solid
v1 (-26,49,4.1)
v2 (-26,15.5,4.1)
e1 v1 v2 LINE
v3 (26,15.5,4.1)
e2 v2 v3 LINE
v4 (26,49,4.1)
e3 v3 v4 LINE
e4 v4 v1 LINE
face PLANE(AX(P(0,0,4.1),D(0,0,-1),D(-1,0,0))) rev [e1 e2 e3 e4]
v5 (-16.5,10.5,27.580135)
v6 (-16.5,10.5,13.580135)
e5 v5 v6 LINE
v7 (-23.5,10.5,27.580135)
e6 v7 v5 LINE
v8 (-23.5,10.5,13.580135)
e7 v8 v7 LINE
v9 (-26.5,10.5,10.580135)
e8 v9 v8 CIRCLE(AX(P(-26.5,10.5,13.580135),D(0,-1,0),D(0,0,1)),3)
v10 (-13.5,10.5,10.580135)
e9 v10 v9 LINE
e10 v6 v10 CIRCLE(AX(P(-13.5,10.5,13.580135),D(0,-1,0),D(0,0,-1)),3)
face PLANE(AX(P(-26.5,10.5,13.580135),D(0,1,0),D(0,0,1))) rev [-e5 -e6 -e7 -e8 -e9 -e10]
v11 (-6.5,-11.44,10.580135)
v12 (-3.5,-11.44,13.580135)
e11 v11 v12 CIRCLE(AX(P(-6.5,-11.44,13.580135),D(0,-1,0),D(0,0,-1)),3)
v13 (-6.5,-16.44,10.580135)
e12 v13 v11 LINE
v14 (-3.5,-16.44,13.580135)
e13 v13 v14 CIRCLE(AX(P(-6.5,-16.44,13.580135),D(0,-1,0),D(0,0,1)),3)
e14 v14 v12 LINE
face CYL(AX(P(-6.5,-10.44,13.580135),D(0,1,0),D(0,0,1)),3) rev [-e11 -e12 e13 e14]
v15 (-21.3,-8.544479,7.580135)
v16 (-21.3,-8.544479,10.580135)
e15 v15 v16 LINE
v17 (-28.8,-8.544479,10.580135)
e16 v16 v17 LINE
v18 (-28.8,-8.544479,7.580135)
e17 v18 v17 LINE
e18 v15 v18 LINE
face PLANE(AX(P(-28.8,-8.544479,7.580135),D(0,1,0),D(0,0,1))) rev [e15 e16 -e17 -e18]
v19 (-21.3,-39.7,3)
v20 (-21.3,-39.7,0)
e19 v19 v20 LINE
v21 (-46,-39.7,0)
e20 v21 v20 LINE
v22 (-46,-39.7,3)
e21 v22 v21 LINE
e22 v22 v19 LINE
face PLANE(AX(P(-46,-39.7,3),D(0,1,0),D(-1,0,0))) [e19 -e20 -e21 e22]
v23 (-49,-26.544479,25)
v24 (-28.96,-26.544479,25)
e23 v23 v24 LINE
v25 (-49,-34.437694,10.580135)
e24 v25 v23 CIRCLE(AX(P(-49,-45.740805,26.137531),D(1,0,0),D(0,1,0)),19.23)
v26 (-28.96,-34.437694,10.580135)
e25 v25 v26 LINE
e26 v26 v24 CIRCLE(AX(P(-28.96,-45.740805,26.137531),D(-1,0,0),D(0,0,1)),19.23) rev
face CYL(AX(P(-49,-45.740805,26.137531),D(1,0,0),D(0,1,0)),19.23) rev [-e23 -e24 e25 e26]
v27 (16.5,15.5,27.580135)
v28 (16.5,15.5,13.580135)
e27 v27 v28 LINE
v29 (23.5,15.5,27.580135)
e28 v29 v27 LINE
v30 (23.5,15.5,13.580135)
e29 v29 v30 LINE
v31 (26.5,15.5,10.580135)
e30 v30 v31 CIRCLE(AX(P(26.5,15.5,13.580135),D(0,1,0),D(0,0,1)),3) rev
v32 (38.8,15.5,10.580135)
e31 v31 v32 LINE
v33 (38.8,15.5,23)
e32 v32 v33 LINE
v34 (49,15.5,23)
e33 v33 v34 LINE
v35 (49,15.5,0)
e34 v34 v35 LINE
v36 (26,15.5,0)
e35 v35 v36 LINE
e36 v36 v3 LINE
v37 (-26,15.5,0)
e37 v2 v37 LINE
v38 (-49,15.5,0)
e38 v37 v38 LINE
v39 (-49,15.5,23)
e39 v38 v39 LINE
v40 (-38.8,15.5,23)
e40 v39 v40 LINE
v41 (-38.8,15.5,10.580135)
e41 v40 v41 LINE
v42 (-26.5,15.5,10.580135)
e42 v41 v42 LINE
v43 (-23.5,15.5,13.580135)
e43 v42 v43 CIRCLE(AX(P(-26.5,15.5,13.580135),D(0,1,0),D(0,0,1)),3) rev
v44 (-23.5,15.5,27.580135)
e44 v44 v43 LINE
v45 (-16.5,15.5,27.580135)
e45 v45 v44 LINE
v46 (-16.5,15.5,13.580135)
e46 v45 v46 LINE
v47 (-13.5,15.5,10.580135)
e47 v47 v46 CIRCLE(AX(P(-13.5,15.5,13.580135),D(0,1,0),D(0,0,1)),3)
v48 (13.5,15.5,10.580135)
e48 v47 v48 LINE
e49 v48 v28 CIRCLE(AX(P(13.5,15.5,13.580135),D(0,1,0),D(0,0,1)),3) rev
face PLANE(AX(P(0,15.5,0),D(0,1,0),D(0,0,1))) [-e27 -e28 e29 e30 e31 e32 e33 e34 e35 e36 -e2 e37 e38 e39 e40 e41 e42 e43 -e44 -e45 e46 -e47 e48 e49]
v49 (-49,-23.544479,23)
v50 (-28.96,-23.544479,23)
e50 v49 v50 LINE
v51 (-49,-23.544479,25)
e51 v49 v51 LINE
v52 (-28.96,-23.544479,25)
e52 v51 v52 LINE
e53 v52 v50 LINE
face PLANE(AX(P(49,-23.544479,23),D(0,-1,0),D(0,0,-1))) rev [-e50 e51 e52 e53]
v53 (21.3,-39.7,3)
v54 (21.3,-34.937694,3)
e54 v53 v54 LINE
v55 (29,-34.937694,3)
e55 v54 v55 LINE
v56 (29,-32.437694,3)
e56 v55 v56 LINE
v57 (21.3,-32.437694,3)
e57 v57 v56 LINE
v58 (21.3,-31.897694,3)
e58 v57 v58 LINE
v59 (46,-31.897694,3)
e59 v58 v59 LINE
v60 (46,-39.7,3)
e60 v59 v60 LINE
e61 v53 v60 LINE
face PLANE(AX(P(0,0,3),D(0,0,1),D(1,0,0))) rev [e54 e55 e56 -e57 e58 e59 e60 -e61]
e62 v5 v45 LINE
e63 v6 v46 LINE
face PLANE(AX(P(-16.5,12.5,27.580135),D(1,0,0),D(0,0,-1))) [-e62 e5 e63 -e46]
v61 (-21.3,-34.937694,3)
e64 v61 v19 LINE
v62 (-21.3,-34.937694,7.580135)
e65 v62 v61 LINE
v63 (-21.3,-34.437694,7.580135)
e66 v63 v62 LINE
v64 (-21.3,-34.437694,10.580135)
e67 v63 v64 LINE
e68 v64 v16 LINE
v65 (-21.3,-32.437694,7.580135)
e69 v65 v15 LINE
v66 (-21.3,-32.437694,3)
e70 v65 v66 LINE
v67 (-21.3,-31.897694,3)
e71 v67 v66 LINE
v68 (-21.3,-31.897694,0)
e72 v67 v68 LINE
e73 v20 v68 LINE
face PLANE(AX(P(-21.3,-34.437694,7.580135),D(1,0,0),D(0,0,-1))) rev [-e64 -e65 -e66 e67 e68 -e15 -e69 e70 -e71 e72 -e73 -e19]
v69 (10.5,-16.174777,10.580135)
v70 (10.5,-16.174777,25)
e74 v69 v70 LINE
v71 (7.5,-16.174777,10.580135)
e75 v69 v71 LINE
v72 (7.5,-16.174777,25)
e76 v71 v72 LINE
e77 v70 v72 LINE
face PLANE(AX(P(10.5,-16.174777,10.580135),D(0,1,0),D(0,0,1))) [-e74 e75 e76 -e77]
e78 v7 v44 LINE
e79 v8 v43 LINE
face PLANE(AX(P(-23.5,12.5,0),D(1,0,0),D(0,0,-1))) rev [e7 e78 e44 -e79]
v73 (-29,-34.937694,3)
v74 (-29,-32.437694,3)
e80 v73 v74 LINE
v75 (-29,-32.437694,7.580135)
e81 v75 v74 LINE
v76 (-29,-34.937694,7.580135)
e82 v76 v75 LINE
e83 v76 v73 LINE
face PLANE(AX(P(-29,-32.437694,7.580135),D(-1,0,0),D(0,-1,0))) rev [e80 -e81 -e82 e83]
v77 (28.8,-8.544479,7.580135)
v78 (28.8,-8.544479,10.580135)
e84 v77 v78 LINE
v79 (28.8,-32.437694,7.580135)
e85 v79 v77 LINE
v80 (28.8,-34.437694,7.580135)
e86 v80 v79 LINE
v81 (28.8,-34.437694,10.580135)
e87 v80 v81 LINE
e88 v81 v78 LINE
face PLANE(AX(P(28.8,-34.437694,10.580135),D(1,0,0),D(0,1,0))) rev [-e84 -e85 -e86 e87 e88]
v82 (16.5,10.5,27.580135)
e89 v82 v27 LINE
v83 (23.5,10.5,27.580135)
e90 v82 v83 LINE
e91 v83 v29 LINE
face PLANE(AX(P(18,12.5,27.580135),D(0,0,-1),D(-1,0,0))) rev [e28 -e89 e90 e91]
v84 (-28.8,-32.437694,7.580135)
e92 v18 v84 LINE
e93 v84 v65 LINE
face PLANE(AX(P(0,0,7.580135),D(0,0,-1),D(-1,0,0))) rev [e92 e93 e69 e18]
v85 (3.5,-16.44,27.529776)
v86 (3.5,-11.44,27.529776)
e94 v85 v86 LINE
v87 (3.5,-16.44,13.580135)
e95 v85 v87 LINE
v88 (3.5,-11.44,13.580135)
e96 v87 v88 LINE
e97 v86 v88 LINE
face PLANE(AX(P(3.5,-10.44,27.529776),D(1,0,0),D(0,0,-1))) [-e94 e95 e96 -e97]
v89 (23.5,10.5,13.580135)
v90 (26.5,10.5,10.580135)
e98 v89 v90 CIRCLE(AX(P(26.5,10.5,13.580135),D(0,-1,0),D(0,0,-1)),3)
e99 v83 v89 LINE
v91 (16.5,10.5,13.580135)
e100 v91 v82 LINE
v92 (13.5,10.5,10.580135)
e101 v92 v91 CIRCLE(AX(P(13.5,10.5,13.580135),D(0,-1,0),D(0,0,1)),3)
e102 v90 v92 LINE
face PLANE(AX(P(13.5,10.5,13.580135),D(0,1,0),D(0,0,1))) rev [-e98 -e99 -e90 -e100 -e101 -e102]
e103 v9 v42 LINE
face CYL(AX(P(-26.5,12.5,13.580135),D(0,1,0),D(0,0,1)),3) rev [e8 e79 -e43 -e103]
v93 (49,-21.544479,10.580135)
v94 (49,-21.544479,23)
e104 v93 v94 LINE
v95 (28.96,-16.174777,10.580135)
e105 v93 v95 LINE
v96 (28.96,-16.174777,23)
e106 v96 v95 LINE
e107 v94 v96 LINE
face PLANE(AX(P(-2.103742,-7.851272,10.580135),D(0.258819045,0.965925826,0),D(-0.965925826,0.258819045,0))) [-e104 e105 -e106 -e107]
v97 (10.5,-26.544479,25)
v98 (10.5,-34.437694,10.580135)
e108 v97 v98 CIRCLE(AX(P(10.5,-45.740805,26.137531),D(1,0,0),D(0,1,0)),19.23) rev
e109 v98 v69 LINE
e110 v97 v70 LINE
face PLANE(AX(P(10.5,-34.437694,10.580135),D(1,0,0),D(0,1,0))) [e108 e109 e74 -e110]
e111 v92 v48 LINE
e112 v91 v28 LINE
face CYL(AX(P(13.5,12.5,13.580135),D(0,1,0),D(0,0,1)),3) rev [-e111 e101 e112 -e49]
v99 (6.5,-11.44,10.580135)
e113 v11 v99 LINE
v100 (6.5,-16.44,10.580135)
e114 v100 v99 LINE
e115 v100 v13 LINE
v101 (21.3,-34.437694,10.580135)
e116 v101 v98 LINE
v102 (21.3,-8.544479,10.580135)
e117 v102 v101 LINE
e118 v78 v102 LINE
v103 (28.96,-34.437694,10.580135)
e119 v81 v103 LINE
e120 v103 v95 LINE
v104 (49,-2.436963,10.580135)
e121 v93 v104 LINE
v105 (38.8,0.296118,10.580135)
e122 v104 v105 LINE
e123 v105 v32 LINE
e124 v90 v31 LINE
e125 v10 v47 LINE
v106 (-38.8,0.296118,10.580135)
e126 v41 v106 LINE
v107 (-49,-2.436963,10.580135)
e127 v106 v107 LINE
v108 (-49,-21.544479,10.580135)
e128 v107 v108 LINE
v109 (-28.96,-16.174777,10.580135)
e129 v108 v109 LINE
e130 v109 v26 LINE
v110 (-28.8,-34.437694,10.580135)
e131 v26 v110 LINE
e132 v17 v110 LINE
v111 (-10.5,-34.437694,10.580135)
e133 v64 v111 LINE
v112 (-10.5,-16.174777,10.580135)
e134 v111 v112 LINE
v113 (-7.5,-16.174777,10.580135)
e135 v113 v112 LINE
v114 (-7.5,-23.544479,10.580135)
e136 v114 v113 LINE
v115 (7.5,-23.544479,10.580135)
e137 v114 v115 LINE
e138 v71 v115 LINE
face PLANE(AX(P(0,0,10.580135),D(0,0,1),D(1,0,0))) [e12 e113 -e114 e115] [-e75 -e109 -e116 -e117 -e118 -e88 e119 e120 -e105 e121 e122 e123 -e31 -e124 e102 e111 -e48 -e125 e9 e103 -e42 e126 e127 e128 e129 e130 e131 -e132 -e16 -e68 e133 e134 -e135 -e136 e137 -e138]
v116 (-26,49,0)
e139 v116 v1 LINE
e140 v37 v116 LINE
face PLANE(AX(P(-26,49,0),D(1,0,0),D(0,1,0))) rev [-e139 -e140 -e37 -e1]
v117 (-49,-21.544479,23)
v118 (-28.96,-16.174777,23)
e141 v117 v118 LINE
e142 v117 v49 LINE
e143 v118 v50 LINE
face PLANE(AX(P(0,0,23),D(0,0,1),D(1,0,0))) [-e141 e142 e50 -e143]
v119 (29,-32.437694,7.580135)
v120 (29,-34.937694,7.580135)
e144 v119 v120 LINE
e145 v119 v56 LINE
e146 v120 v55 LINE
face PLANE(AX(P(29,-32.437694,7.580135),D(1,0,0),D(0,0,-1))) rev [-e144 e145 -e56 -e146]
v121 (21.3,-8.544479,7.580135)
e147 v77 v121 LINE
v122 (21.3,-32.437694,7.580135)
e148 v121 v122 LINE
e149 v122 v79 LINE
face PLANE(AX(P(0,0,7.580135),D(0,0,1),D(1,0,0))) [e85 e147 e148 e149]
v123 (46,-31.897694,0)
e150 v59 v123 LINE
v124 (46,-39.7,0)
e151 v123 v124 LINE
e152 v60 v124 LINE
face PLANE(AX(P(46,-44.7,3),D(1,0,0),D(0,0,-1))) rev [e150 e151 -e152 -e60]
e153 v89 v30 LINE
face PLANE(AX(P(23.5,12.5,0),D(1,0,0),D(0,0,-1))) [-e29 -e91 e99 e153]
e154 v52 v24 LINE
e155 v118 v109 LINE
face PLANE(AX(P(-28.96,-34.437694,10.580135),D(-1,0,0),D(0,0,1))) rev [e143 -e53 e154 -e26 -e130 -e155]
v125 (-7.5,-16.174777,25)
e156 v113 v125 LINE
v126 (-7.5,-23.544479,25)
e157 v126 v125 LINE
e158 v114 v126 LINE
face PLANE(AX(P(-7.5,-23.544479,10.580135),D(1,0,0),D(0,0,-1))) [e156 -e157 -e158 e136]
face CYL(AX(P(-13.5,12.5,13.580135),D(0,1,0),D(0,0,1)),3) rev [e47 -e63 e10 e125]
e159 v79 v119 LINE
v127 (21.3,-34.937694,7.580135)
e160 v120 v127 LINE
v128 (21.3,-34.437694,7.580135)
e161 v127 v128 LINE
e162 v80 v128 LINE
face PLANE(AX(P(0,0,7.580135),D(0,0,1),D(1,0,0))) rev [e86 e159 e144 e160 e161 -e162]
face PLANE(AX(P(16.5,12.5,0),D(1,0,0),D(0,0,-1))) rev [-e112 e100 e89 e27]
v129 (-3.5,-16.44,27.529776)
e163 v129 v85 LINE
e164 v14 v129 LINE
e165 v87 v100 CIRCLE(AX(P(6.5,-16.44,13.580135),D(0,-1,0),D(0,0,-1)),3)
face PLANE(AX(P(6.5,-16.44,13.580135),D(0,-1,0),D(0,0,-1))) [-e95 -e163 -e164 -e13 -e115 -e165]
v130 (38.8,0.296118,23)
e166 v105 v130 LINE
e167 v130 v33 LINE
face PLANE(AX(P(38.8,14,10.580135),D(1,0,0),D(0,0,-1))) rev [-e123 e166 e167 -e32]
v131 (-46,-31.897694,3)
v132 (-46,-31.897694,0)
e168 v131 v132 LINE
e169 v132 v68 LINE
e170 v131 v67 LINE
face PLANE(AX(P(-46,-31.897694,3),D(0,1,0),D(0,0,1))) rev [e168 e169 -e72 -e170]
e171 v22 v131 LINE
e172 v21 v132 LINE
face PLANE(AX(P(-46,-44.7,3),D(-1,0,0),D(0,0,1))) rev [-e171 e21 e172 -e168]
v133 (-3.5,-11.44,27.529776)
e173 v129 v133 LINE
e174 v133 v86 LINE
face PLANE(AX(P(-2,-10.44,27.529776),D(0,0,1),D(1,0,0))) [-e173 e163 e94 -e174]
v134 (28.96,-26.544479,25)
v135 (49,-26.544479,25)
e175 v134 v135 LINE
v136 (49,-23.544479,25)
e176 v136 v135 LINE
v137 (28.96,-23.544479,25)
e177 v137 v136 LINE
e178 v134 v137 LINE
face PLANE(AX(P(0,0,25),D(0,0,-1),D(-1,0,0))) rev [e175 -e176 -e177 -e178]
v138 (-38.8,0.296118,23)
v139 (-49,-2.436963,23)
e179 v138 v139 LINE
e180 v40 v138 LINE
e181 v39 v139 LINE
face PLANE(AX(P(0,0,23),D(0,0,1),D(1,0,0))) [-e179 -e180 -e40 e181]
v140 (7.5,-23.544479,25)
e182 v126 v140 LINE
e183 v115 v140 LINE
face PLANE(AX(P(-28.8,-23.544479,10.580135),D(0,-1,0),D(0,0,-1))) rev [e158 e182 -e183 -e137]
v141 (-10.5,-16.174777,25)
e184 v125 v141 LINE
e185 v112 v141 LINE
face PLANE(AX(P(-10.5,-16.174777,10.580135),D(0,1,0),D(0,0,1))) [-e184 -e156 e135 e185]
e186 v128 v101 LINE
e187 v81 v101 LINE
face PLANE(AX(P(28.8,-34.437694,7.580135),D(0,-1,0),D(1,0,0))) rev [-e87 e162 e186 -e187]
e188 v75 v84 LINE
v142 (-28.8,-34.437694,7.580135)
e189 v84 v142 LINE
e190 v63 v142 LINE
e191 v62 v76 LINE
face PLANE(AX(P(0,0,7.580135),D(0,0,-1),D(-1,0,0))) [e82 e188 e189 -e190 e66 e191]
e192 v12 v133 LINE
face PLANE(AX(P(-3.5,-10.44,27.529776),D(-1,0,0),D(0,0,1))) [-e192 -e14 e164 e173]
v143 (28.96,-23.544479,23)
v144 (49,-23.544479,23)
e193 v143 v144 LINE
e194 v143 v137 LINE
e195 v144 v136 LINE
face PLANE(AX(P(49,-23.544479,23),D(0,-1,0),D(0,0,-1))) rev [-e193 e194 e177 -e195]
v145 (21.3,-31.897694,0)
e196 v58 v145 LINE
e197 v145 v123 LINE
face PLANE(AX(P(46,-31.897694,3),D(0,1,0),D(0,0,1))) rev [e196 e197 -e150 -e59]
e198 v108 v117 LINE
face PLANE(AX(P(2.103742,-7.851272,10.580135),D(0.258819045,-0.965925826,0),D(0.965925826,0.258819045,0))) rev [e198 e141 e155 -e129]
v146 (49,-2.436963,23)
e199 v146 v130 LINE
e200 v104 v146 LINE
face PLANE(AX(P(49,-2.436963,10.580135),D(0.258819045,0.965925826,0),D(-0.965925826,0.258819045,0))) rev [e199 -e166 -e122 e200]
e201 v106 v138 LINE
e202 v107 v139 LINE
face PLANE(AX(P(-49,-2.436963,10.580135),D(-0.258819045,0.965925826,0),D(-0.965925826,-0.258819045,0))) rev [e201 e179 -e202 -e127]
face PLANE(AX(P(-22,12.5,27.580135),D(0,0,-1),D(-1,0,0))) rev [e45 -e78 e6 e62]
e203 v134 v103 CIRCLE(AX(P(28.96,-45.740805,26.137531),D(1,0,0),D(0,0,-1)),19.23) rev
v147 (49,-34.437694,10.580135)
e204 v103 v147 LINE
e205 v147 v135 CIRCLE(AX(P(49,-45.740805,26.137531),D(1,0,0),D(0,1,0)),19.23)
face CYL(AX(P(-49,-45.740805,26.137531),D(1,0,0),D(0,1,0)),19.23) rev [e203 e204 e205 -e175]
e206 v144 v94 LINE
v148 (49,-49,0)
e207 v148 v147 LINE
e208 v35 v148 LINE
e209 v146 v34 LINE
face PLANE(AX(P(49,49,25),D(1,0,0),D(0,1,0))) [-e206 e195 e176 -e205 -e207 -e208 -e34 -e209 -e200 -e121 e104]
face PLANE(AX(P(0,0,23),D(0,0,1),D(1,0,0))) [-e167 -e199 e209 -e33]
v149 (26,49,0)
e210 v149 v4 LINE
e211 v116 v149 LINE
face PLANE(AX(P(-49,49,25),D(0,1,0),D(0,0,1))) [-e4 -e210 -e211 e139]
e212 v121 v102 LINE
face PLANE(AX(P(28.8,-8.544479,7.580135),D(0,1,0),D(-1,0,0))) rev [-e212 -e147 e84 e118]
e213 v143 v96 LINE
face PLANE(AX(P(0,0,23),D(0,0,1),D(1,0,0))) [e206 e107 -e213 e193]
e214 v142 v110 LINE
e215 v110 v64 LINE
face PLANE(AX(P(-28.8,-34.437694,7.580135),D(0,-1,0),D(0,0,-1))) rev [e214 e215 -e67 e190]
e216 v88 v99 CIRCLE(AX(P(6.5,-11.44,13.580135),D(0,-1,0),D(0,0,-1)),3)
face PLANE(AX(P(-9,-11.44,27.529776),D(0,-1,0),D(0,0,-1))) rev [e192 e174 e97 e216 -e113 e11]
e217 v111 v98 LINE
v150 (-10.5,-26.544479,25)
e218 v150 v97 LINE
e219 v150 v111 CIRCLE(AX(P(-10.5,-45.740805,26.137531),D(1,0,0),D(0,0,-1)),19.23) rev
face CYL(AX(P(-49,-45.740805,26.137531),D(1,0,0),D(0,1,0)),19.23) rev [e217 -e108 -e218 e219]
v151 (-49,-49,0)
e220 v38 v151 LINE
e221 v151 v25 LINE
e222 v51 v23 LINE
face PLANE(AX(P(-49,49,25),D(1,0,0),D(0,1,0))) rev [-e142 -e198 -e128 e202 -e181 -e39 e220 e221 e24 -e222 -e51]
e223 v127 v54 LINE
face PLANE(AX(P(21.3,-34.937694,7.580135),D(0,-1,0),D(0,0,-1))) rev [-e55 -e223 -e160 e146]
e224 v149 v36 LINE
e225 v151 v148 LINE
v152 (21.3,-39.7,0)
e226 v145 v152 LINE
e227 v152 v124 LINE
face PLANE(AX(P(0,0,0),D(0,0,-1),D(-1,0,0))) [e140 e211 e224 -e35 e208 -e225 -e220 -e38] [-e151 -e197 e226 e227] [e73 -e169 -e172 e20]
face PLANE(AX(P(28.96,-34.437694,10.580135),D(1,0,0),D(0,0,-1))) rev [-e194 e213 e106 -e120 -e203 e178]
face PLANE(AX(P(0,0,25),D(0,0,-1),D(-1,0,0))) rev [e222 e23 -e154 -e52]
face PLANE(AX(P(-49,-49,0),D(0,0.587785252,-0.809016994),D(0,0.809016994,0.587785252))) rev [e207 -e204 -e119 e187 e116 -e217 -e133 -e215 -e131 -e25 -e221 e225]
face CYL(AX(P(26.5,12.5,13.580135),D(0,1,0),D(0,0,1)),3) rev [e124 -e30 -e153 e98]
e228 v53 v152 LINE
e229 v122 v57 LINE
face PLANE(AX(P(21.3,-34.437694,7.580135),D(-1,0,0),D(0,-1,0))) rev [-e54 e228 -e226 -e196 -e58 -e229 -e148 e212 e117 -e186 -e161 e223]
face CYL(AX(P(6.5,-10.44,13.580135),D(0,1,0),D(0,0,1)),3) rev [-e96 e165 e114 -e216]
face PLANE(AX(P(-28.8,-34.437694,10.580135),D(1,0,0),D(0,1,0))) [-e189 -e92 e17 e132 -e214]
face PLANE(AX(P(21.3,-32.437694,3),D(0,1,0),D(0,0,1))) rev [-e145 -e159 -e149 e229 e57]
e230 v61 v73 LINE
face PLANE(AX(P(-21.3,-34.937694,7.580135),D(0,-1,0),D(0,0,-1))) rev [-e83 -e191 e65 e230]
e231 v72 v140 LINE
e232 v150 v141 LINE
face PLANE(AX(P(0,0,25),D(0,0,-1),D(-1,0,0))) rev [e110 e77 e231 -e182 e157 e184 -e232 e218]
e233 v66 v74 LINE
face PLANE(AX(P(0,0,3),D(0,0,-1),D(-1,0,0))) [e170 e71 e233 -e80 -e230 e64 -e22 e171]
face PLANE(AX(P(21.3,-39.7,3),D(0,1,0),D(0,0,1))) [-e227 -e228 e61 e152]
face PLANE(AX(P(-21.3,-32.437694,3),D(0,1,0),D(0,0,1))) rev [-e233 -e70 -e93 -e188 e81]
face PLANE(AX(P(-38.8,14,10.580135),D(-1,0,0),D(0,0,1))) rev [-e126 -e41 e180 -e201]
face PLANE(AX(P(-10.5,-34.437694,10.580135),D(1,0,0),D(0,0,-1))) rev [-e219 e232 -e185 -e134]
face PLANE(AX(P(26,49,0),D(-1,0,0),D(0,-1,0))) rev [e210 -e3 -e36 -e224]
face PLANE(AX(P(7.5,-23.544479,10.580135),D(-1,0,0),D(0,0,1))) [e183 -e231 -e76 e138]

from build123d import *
from OCP.BRepAlgoAPI import BRepAlgoAPI_Cut
from OCP.TopTools import TopTools_ListOfShape
from build123d.topology import SkipClean

# Parameters (mm, degrees)
CROQUIS1_W               = 98
CROQUIS1_H               = 98
SALIENTE_EXTRUIR2_DEPTH  = 25
CORTAR_EXTRUIR1_DEPTH    = 113.383272777
CROQUIS4_W               = 23
CROQUIS4_H               = 35
CORTAR_EXTRUIR2_DEPTH    = 74.668174947
CROQUIS5_W               = 52
CROQUIS5_H               = 35
CORTAR_EXTRUIR3_DEPTH    = 20
CROQUIS6_W               = 18.3
CROQUIS6_H               = 10.893215352
CORTAR_EXTRUIR4_DEPTH    = 14.419865
CROQUIS7_W               = 57.6
CROQUIS7_H               = 37.544478749
CORTAR_EXTRUIR5_DEPTH    = 14.419865
CROQUIS8_W               = 98
CROQUIS8_H               = 37.544478749
CORTAR_EXTRUIR6_DEPTH    = 2
CORTAR_EXTRUIR7_DEPTH    = 12.419865
CROQUIS10_W              = 10
CROQUIS10_H              = 14.511396986
CORTAR_EXTRUIR8_DEPTH    = 12.419865
CROQUIS13_W              = 7.5
CROQUIS13_H              = 25.893215352
CORTAR_EXTRUIR9_DEPTH    = 3
CROQUIS16_W              = 7.5
CROQUIS16_H              = 2
CORTAR_EXTRUIR10_DEPTH   = 72.452443713
CORTAR_EXTRUIR11_DEPTH   = 3
SALIENTE_EXTRUIR4_DEPTH  = 1.5
CROQUIS24_W              = 52
CROQUIS24_H              = 33.5
SALIENTE_EXTRUIR7_DEPTH  = 1.1
CORTAR_EXTRUIR12_START   = -14.419865
CROQUIS25_W              = 0.16
CROQUIS25_H              = 18.305789039
CORTAR_EXTRUIR12_DEPTH   = 14.419865
CROQUIS26_W              = 3
CROQUIS26_H              = 7.369701816
SALIENTE_EXTRUIR8_DEPTH  = 25
CORTAR_EXTRUIR13_DEPTH   = 12.419865
CROQUIS28_W              = 52
CROQUIS28_H              = 33.5
CORTAR_EXTRUIR14_DEPTH   = 2
CROQUIS29_W              = 24.7
CROQUIS29_H              = 3
SALIENTE_EXTRUIR10_DEPTH = 3
CROQUIS30_W              = 17.2
CROQUIS30_H              = 3.1
CORTAR_EXTRUIR15_DEPTH   = 3
SALIENTE_EXTRUIR11_DEPTH = 3
CROQUIS33_W              = 4
CROQUIS33_H              = 3
CORTAR_EXTRUIR16_DEPTH   = 3
SALIENTE_EXTRUIR12_START = -22.94
SALIENTE_EXTRUIR12_DEPTH = 3
SALIENTE_EXTRUIR13_START = -3
SALIENTE_EXTRUIR13_DEPTH = 3
SALIENTE_EXTRUIR14_START = -3
SALIENTE_EXTRUIR14_DEPTH = 3
CORTAR_EXTRUIR17_DEPTH   = 12.419865
SALIENTE_EXTRUIR15_START = -7.580135
CROQUIS39_W              = 7.5
CROQUIS39_H              = 2
SALIENTE_EXTRUIR15_DEPTH = 7.580135
CROQUIS40_W              = 24.7
CROQUIS40_H              = 2
SALIENTE_EXTRUIR16_DEPTH = 3
CROQUIS41_W              = 24.7
CROQUIS41_H              = 2
CORTAR_EXTRUIR18_DEPTH   = 3
CROQUIS42_W              = 7.7
CROQUIS42_H              = 2.5
CORTAR_EXTRUIR19_DEPTH   = 7.580135
SALIENTE_EXTRUIR17_START = -5
SALIENTE_EXTRUIR17_DEPTH = 5
CROQUIS44_W              = 16.949641927
CROQUIS44_H              = 2
CORTAR_EXTRUIR20_DEPTH   = 12.5
CROQUIS45_W              = 24.7
CROQUIS45_H              = 0.54
CORTAR_EXTRUIR21_DEPTH   = 3
SALIENTE_EXTRUIR18_START = -5
SALIENTE_EXTRUIR18_DEPTH = 2
SALIENTE_EXTRUIR19_START = -7
SALIENTE_EXTRUIR19_DEPTH = 4
CROQUIS49_W              = 16.949641927
CROQUIS49_H              = 2
CORTAR_EXTRUIR22_DEPTH   = 12.5


with BuildPart() as part:
    # Croquis1 → Saliente-Extruir2 (new body)
    with BuildSketch(Plane.XY):
        Rectangle(CROQUIS1_W, CROQUIS1_H)
    extrude(amount=SALIENTE_EXTRUIR2_DEPTH)

    # Croquis3 → Cortar-Extruir1 (cut, through all)
    with BuildSketch(Plane(origin=(49, 0, 0), x_dir=(0, 0, -1), z_dir=(1, 0, 0))):
        with BuildLine():
            Line((0, -49), (-10.580134541, -34.437694101))
            ThreePointArc((-10.580134541, -34.437694101), (-16.90412089, -28.872579006), (-25, -26.544478749))
            Line((-25, -26.544478749), (-25, -49))
            Line((-25, -49), (0, -49))
        make_face()
    extrude(amount=-CORTAR_EXTRUIR1_DEPTH, mode=Mode.SUBTRACT)

    # Croquis4 → Cortar-Extruir2 (cut, through all)
    with BuildSketch(Plane.XY.offset(25)):
        with Locations((-37.5, 31.5)):
            Rectangle(CROQUIS4_W, CROQUIS4_H)
        with Locations((37.5, 31.5)):
            Rectangle(CROQUIS4_W, CROQUIS4_H)
    extrude(amount=-CORTAR_EXTRUIR2_DEPTH, mode=Mode.SUBTRACT)

    # Croquis5 → Cortar-Extruir3 (cut)
    with BuildSketch(Plane.XY.offset(25)):
        with Locations((0, 31.5)):
            Rectangle(CROQUIS5_W, CROQUIS5_H)
    extrude(amount=-CORTAR_EXTRUIR3_DEPTH, mode=Mode.SUBTRACT)

    # Croquis6 → Cortar-Extruir4 (cut)
    with BuildSketch(Plane.XY.offset(25)):
        with Locations((-19.65, -28.991086425)):
            Rectangle(CROQUIS6_W, CROQUIS6_H)
        with Locations((19.65, -28.991086425)):
            Rectangle(CROQUIS6_W, CROQUIS6_H)
    extrude(amount=-CORTAR_EXTRUIR4_DEPTH, mode=Mode.SUBTRACT)

    # Croquis7 → Cortar-Extruir5 (cut)
    with BuildSketch(Plane.XY.offset(25)):
        with Locations((0, -4.772239375)):
            Rectangle(CROQUIS7_W, CROQUIS7_H)
    extrude(amount=-CORTAR_EXTRUIR5_DEPTH, mode=Mode.SUBTRACT)

    # Croquis8 → Cortar-Extruir6 (cut)
    with BuildSketch(Plane.XY.offset(25)):
        with Locations((0, -4.772239375)):
            Rectangle(CROQUIS8_W, CROQUIS8_H)
    extrude(amount=-CORTAR_EXTRUIR6_DEPTH, mode=Mode.SUBTRACT)

    # Croquis9 → Cortar-Extruir7 (cut)
    with BuildSketch(Plane.XY.offset(23)):
        Polygon((-49, -3.244478749), (-49, -21.544478749), (-28.8, -16.131905062), (-28.8, 2.168094938), align=None)
        Polygon((28.8, -16.131905062), (49, -21.544478749), (49, -3.244478749), (28.8, 2.168094938), align=None)
    extrude(amount=-CORTAR_EXTRUIR7_DEPTH, mode=Mode.SUBTRACT)

    # Croquis10 → Cortar-Extruir8 (cut)
    with BuildSketch(Plane.XY.offset(23)):
        with Locations((-33.8, 6.744301507)):
            Rectangle(CROQUIS10_W, CROQUIS10_H)
        with Locations((33.8, 6.744301507)):
            Rectangle(CROQUIS10_W, CROQUIS10_H)
    extrude(amount=-CORTAR_EXTRUIR8_DEPTH, mode=Mode.SUBTRACT)


with BuildPart() as cortar_extruir9_tool:
    # Croquis13 → Cortar-Extruir9 (new body)
    with BuildSketch(Plane.XY.offset(10.580134541)):
        with Locations((-25.05, -21.491086425)):
            Rectangle(CROQUIS13_W, CROQUIS13_H)
        with Locations((25.05, -21.491086425)):
            Rectangle(CROQUIS13_W, CROQUIS13_H)
    extrude(amount=-CORTAR_EXTRUIR9_DEPTH)


with BuildPart() as part_1:
    add(part.part)

    # Cortar-Extruir9: cut by cortar_extruir9_tool, with a tolerance
    cortar_extruir9_stock = TopTools_ListOfShape()
    cortar_extruir9_stock.Append(part_1.part.wrapped)
    cortar_extruir9_tools = TopTools_ListOfShape()
    cortar_extruir9_tools.Append(cortar_extruir9_tool.part.wrapped)
    cortar_extruir9_cut = BRepAlgoAPI_Cut()
    cortar_extruir9_cut.SetArguments(cortar_extruir9_stock)
    cortar_extruir9_cut.SetTools(cortar_extruir9_tools)
    cortar_extruir9_cut.SetFuzzyValue(0.00001)
    cortar_extruir9_cut.Build()
    add(Compound.cast(cortar_extruir9_cut.Shape()).solids(), mode=Mode.REPLACE)

    # Croquis16 → Cortar-Extruir10 (cut, through all)
    with BuildSketch(Plane.XY.offset(7.580134541)):
        with Locations((-25.05, -33.437694101)):
            Rectangle(CROQUIS16_W, CROQUIS16_H)
        with Locations((25.05, -33.437694101)):
            Rectangle(CROQUIS16_W, CROQUIS16_H)
    extrude(amount=-CORTAR_EXTRUIR10_DEPTH, mode=Mode.SUBTRACT)

    # Croquis17 → Cortar-Extruir11 (cut)
    with BuildSketch(Plane(origin=(0, 0, 0), x_dir=(-1, 0, 0), z_dir=(0, 0, -1))):
        Polygon((-46, -44.7), (-21.3, -44.7), (-21.3, -37), (-21.3, -34.437694101), (-28.8, -34.437694101), (-28.8, -37), (-46, -37), align=None)
        Polygon((46, -44.7), (21.3, -44.7), (21.3, -37), (21.3, -34.437694101), (28.8, -34.437694101), (28.8, -37), (46, -37), align=None)
    extrude(amount=-CORTAR_EXTRUIR11_DEPTH, mode=Mode.SUBTRACT)

    # Croquis21 → Saliente-Extruir4 (add)
    with BuildSketch(Plane(origin=(0, 14, 0), x_dir=(1, 0, 0), z_dir=(0, 1, 0))):
        Polygon((-49, 0), (-49, -23), (-38.8, -23), (-38.8, -10.580134541), (38.8, -10.580134541), (38.8, -23), (49, -23), (49, 0), (26, 0), (26, -5), (-26, -5), (-26, 0), align=None)
    extrude(amount=SALIENTE_EXTRUIR4_DEPTH)

    # Croquis24 → Saliente-Extruir7 (add)
    with BuildSketch(Plane.XY.offset(5)):
        with Locations((0, 32.25)):
            Rectangle(CROQUIS24_W, CROQUIS24_H)
    extrude(amount=SALIENTE_EXTRUIR7_DEPTH)

    # Croquis25 → Cortar-Extruir12 (cut)
    with BuildSketch(Plane.XY.offset(25).offset(CORTAR_EXTRUIR12_START)):
        with Locations((28.88, -25.284799582)):
            Rectangle(CROQUIS25_W, CROQUIS25_H)
        with Locations((-28.88, -25.284799582)):
            Rectangle(CROQUIS25_W, CROQUIS25_H)
    extrude(amount=CORTAR_EXTRUIR12_DEPTH, mode=Mode.SUBTRACT)

    # Croquis26 → Saliente-Extruir8 (add)
    with BuildSketch(Plane.XY.offset(25)):
        with Locations((-9, -19.859627841)):
            Rectangle(CROQUIS26_W, CROQUIS26_H)
        with Locations((9, -19.859627841)):
            Rectangle(CROQUIS26_W, CROQUIS26_H)
    extrude(amount=-SALIENTE_EXTRUIR8_DEPTH)

    # Croquis27 → Cortar-Extruir13 (cut)
    with BuildSketch(Plane.XY.offset(23)):
        Polygon((49, -3.07883456), (38.8, -0.345752797), (38.8, -0.511396986), (49, -3.244478749), align=None)
        Polygon((-38.8, -0.511396986), (-49, -3.244478749), (-49, -3.07883456), (-38.8, -0.345752797), align=None)
    extrude(amount=-CORTAR_EXTRUIR13_DEPTH, mode=Mode.SUBTRACT)

    # Croquis28 → Cortar-Extruir14 (cut)
    with BuildSketch(Plane.XY.offset(6.1)):
        with Locations((0, 32.25)):
            Rectangle(CROQUIS28_W, CROQUIS28_H)
    extrude(amount=-CORTAR_EXTRUIR14_DEPTH, mode=Mode.SUBTRACT)

    # Croquis29 → Saliente-Extruir10 (add)
    with BuildSketch(Plane(origin=(0, 0, 0), x_dir=(-1, 0, 0), z_dir=(0, 0, -1))):
        with Locations((-33.65, -43.2)):
            Rectangle(CROQUIS29_W, CROQUIS29_H)
        with Locations((33.65, -43.2)):
            Rectangle(CROQUIS29_W, CROQUIS29_H)
    extrude(amount=-SALIENTE_EXTRUIR10_DEPTH)

    # Croquis30 → Cortar-Extruir15 (cut)
    with BuildSketch(Plane(origin=(0, 0, 0), x_dir=(-1, 0, 0), z_dir=(0, 0, -1))):
        with Locations((-37.4, -35.45)):
            Rectangle(CROQUIS30_W, CROQUIS30_H)
        with Locations((37.4, -35.45)):
            Rectangle(CROQUIS30_W, CROQUIS30_H)
    extrude(amount=-CORTAR_EXTRUIR15_DEPTH, mode=Mode.SUBTRACT)

    # Croquis32 → Saliente-Extruir11 (add)
    with BuildSketch(Plane(origin=(0, 15.5, 0), x_dir=(1, 0, 0), z_dir=(0, 1, 0))):
        with BuildLine():
            Line((22, -13.580134541), (22, -30.580134541))
            Line((22, -30.580134541), (18, -30.580134541))
            Line((18, -30.580134541), (18, -13.580134541))
            ThreePointArc((18, -13.580134541), (17.121320344, -11.458814198), (15, -10.580134541))
            Line((15, -10.580134541), (25, -10.580134541))
            ThreePointArc((25, -10.580134541), (22.878679656, -11.458814198), (22, -13.580134541))
        make_face()
        with BuildLine():
            Line((-25, -10.580134541), (-15, -10.580134541))
            ThreePointArc((-15, -10.580134541), (-17.121320344, -11.458814198), (-18, -13.580134541))
            Line((-18, -13.580134541), (-18, -30.580134541))
            Line((-18, -30.580134541), (-22, -30.580134541))
            Line((-22, -30.580134541), (-22, -13.580134541))
            ThreePointArc((-22, -13.580134541), (-22.878679656, -11.458814198), (-25, -10.580134541))
        make_face()
    extrude(amount=-SALIENTE_EXTRUIR11_DEPTH)

    # Croquis33 → Cortar-Extruir16 (cut)
    with BuildSketch(Plane(origin=(0, 15.5, 0), x_dir=(1, 0, 0), z_dir=(0, 1, 0))):
        with Locations((20, -29.080134541)):
            Rectangle(CROQUIS33_W, CROQUIS33_H)
        with Locations((-20, -29.080134541)):
            Rectangle(CROQUIS33_W, CROQUIS33_H)
    extrude(amount=-CORTAR_EXTRUIR16_DEPTH, mode=Mode.SUBTRACT)

    # Croquis34 → Saliente-Extruir12 (add)
    with BuildSketch(Plane(origin=(0, 15.5, 0), x_dir=(1, 0, 0), z_dir=(0, 1, 0)).offset(SALIENTE_EXTRUIR12_START)):
        with BuildLine():
            Line((-2, -13.580134541), (-2, -27.529776468))
            Line((-2, -27.529776468), (2, -27.529776468))
            Line((2, -27.529776468), (2, -13.580134541))
            ThreePointArc((2, -13.580134541), (2.878679656, -11.458814198), (5, -10.580134541))
            Line((5, -10.580134541), (-5, -10.580134541))
            ThreePointArc((-5, -10.580134541), (-2.878679656, -11.458814198), (-2, -13.580134541))
        make_face()
    extrude(amount=-SALIENTE_EXTRUIR12_DEPTH)

    # Croquis35 → Saliente-Extruir13 (add)
    with BuildSketch(Plane(origin=(0, 15.5, 0), x_dir=(1, 0, 0), z_dir=(0, 1, 0)).offset(SALIENTE_EXTRUIR13_START)):
        with BuildLine():
            Line((23.5, -27.580134541), (23.5, -13.580134541))
            ThreePointArc((23.5, -13.580134541), (24.378679656, -11.458814198), (26.5, -10.580134541))
            Line((26.5, -10.580134541), (22, -10.580134541))
            Line((22, -10.580134541), (22, -27.580134541))
            Line((22, -27.580134541), (23.5, -27.580134541))
        make_face()
        with BuildLine():
            Line((18, -10.580134541), (13.5, -10.580134541))
            ThreePointArc((13.5, -10.580134541), (15.621320344, -11.458814198), (16.5, -13.580134541))
            Line((16.5, -13.580134541), (16.5, -27.580134541))
            Line((16.5, -27.580134541), (18, -27.580134541))
            Line((18, -27.580134541), (18, -10.580134541))
        make_face()
        with BuildLine():
            Line((-22, -10.580134541), (-26.5, -10.580134541))
            ThreePointArc((-26.5, -10.580134541), (-24.378679656, -11.458814198), (-23.5, -13.580134541))
            Line((-23.5, -13.580134541), (-23.5, -27.580134541))
            Line((-23.5, -27.580134541), (-22, -27.580134541))
            Line((-22, -27.580134541), (-22, -10.580134541))
        make_face()
        with BuildLine():
            ThreePointArc((-13.5, -10.580134541), (-15.621320344, -11.458814198), (-16.5, -13.580134541))
            Line((-16.5, -13.580134541), (-16.5, -27.580134541))
            Line((-16.5, -27.580134541), (-18, -27.580134541))
            Line((-18, -27.580134541), (-18, -10.580134541))
            Line((-18, -10.580134541), (-13.5, -10.580134541))
        make_face()
    extrude(amount=SALIENTE_EXTRUIR13_DEPTH)

    # Croquis36 → Saliente-Extruir14 (add)
    with BuildSketch(Plane(origin=(0, -7.44, 0), x_dir=(1, 0, 0), z_dir=(0, 1, 0)).offset(SALIENTE_EXTRUIR14_START)):
        with BuildLine():
            Line((2, -27.529776468), (3.5, -27.529776468))
            Line((3.5, -27.529776468), (3.5, -13.580134541))
            ThreePointArc((3.5, -13.580134541), (4.378679656, -11.458814198), (6.5, -10.580134541))
            Line((6.5, -10.580134541), (2, -10.580134541))
            Line((2, -10.580134541), (2, -27.529776468))
        make_face()
        with BuildLine():
            Line((-2, -27.529776468), (-3.5, -27.529776468))
            Line((-3.5, -27.529776468), (-3.5, -13.580134541))
            ThreePointArc((-3.5, -13.580134541), (-4.378679656, -11.458814198), (-6.5, -10.580134541))
            Line((-6.5, -10.580134541), (-2, -10.580134541))
            Line((-2, -10.580134541), (-2, -27.529776468))
        make_face()
    extrude(amount=SALIENTE_EXTRUIR14_DEPTH)

    # Croquis37 → Cortar-Extruir17 (cut)
    with BuildSketch(Plane.XY.offset(23)):
        Polygon((-49, -2.436963328), (-38.8, 0.296118434), (-38.8, -0.345752797), (-49, -3.07883456), align=None)
        Polygon((49, -3.07883456), (38.8, -0.345752797), (38.8, 0.296118434), (49, -2.436963328), align=None)
    extrude(amount=-CORTAR_EXTRUIR17_DEPTH, mode=Mode.SUBTRACT)

    # Croquis39 → Saliente-Extruir15 (add)
    with BuildSketch(Plane(origin=(0, 0, 0), x_dir=(-1, 0, 0), z_dir=(0, 0, -1)).offset(SALIENTE_EXTRUIR15_START)):
        with Locations((-25.05, -33.437694101)):
            Rectangle(CROQUIS39_W, CROQUIS39_H)
        with Locations((25.05, -33.437694101)):
            Rectangle(CROQUIS39_W, CROQUIS39_H)
    extrude(amount=SALIENTE_EXTRUIR15_DEPTH)

    # Croquis40 → Saliente-Extruir16 (add)
    with BuildSketch(Plane(origin=(0, 0, 0), x_dir=(-1, 0, 0), z_dir=(0, 0, -1))):
        with Locations((33.65, -40.7)):
            Rectangle(CROQUIS40_W, CROQUIS40_H)
        with Locations((-33.65, -40.7)):
            Rectangle(CROQUIS40_W, CROQUIS40_H)
    extrude(amount=-SALIENTE_EXTRUIR16_DEPTH)

    # Croquis41 → Cortar-Extruir18 (cut)
    with BuildSketch(Plane(origin=(0, 0, 0), x_dir=(-1, 0, 0), z_dir=(0, 0, -1))):
        with Locations((-33.65, -33.437694101)):
            Rectangle(CROQUIS41_W, CROQUIS41_H)
        with Locations((33.65, -33.437694101)):
            Rectangle(CROQUIS41_W, CROQUIS41_H)
    extrude(amount=-CORTAR_EXTRUIR18_DEPTH, mode=Mode.SUBTRACT)

    # Croquis42 → Cortar-Extruir19 (cut)
    with BuildSketch(Plane(origin=(0, 0, 0), x_dir=(-1, 0, 0), z_dir=(0, 0, -1))):
        with Locations((25.15, -33.687694101)):
            Rectangle(CROQUIS42_W, CROQUIS42_H)
        with Locations((-25.15, -33.687694101)):
            Rectangle(CROQUIS42_W, CROQUIS42_H)
    extrude(amount=-CORTAR_EXTRUIR19_DEPTH, mode=Mode.SUBTRACT)

    # Croquis43 → Saliente-Extruir17 (add)
    with BuildSketch(Plane(origin=(0, -7.44, 0), x_dir=(1, 0, 0), z_dir=(0, 1, 0)).offset(SALIENTE_EXTRUIR17_START)):
        with BuildLine():
            Line((-3.5, -27.529776468), (3.5, -27.529776468))
            Line((3.5, -27.529776468), (3.5, -13.580134541))
            ThreePointArc((3.5, -13.580134541), (4.378679656, -11.458814198), (6.5, -10.580134541))
            Line((6.5, -10.580134541), (-6.5, -10.580134541))
            ThreePointArc((-6.5, -10.580134541), (-4.378679656, -11.458814198), (-3.5, -13.580134541))
            Line((-3.5, -13.580134541), (-3.5, -27.529776468))
        make_face()
    extrude(amount=SALIENTE_EXTRUIR17_DEPTH)

    # Croquis44 → Cortar-Extruir20 (cut, symmetric)
    with SkipClean():  # the faces are left unmerged after this step: merging them gives an invalid solid
        with BuildSketch(Plane(origin=(3.5, 0, 0), x_dir=(0, 0, -1), z_dir=(1, 0, 0))):
            with Locations((-19.054955505, -8.44)):
                Rectangle(CROQUIS44_W, CROQUIS44_H)
        extrude(amount=CORTAR_EXTRUIR20_DEPTH, both=True, mode=Mode.SUBTRACT)

    # Croquis45 → Cortar-Extruir21 (cut)
    with SkipClean():  # the faces are left unmerged after this step: merging them gives an invalid solid
        with BuildSketch(Plane(origin=(0, 0, 0), x_dir=(-1, 0, 0), z_dir=(0, 0, -1))):
            with Locations((-33.65, -32.167694101)):
                Rectangle(CROQUIS45_W, CROQUIS45_H)
            with Locations((33.65, -32.167694101)):
                Rectangle(CROQUIS45_W, CROQUIS45_H)
        extrude(amount=-CORTAR_EXTRUIR21_DEPTH, mode=Mode.SUBTRACT)

    # Croquis47 → Saliente-Extruir18 (add)
    with SkipClean():  # the faces are left unmerged after this step: merging them gives an invalid solid
        with BuildSketch(Plane(origin=(0, 15.5, 0), x_dir=(1, 0, 0), z_dir=(0, 1, 0)).offset(SALIENTE_EXTRUIR18_START)):
            with BuildLine():
                Line((-23.5, -27.580134541), (-16.5, -27.580134541))
                Line((-16.5, -27.580134541), (-16.5, -13.580134541))
                ThreePointArc((-16.5, -13.580134541), (-15.621320344, -11.458814198), (-13.5, -10.580134541))
                Line((-13.5, -10.580134541), (-26.5, -10.580134541))
                ThreePointArc((-26.5, -10.580134541), (-24.378679656, -11.458814198), (-23.5, -13.580134541))
                Line((-23.5, -13.580134541), (-23.5, -27.580134541))
            make_face()
            with BuildLine():
                Line((16.5, -27.580134541), (16.5, -13.580134541))
                ThreePointArc((16.5, -13.580134541), (15.621320344, -11.458814198), (13.5, -10.580134541))
                Line((13.5, -10.580134541), (26.5, -10.580134541))
                ThreePointArc((26.5, -10.580134541), (24.378679656, -11.458814198), (23.5, -13.580134541))
                Line((23.5, -13.580134541), (23.5, -27.580134541))
                Line((23.5, -27.580134541), (16.5, -27.580134541))
            make_face()
        extrude(amount=SALIENTE_EXTRUIR18_DEPTH)

    # Croquis48 → Saliente-Extruir19 (add)
    with SkipClean():  # the faces are left unmerged after this step: merging them gives an invalid solid
        with BuildSketch(Plane(origin=(0, -9.44, 0), x_dir=(1, 0, 0), z_dir=(0, 1, 0)).offset(SALIENTE_EXTRUIR19_START)):
            with BuildLine():
                Line((3.5, -27.529776468), (-3.5, -27.529776468))
                Line((-3.5, -27.529776468), (-3.5, -13.580134541))
                ThreePointArc((-3.5, -13.580134541), (-4.378679656, -11.458814198), (-6.5, -10.580134541))
                Line((-6.5, -10.580134541), (6.5, -10.580134541))
                ThreePointArc((6.5, -10.580134541), (4.378679656, -11.458814198), (3.5, -13.580134541))
                Line((3.5, -13.580134541), (3.5, -27.529776468))
            make_face()
        extrude(amount=SALIENTE_EXTRUIR19_DEPTH)

    # Croquis49 → Cortar-Extruir22 (cut, symmetric)
    with SkipClean():  # the faces are left unmerged after this step: merging them gives an invalid solid
        with BuildSketch(Plane(origin=(3.5, 0, 0), x_dir=(0, 0, -1), z_dir=(1, 0, 0))):
            with Locations((-19.054955505, -10.44)):
                Rectangle(CROQUIS49_W, CROQUIS49_H)
        extrude(amount=CORTAR_EXTRUIR22_DEPTH, both=True, mode=Mode.SUBTRACT)


solid = part_1.part
